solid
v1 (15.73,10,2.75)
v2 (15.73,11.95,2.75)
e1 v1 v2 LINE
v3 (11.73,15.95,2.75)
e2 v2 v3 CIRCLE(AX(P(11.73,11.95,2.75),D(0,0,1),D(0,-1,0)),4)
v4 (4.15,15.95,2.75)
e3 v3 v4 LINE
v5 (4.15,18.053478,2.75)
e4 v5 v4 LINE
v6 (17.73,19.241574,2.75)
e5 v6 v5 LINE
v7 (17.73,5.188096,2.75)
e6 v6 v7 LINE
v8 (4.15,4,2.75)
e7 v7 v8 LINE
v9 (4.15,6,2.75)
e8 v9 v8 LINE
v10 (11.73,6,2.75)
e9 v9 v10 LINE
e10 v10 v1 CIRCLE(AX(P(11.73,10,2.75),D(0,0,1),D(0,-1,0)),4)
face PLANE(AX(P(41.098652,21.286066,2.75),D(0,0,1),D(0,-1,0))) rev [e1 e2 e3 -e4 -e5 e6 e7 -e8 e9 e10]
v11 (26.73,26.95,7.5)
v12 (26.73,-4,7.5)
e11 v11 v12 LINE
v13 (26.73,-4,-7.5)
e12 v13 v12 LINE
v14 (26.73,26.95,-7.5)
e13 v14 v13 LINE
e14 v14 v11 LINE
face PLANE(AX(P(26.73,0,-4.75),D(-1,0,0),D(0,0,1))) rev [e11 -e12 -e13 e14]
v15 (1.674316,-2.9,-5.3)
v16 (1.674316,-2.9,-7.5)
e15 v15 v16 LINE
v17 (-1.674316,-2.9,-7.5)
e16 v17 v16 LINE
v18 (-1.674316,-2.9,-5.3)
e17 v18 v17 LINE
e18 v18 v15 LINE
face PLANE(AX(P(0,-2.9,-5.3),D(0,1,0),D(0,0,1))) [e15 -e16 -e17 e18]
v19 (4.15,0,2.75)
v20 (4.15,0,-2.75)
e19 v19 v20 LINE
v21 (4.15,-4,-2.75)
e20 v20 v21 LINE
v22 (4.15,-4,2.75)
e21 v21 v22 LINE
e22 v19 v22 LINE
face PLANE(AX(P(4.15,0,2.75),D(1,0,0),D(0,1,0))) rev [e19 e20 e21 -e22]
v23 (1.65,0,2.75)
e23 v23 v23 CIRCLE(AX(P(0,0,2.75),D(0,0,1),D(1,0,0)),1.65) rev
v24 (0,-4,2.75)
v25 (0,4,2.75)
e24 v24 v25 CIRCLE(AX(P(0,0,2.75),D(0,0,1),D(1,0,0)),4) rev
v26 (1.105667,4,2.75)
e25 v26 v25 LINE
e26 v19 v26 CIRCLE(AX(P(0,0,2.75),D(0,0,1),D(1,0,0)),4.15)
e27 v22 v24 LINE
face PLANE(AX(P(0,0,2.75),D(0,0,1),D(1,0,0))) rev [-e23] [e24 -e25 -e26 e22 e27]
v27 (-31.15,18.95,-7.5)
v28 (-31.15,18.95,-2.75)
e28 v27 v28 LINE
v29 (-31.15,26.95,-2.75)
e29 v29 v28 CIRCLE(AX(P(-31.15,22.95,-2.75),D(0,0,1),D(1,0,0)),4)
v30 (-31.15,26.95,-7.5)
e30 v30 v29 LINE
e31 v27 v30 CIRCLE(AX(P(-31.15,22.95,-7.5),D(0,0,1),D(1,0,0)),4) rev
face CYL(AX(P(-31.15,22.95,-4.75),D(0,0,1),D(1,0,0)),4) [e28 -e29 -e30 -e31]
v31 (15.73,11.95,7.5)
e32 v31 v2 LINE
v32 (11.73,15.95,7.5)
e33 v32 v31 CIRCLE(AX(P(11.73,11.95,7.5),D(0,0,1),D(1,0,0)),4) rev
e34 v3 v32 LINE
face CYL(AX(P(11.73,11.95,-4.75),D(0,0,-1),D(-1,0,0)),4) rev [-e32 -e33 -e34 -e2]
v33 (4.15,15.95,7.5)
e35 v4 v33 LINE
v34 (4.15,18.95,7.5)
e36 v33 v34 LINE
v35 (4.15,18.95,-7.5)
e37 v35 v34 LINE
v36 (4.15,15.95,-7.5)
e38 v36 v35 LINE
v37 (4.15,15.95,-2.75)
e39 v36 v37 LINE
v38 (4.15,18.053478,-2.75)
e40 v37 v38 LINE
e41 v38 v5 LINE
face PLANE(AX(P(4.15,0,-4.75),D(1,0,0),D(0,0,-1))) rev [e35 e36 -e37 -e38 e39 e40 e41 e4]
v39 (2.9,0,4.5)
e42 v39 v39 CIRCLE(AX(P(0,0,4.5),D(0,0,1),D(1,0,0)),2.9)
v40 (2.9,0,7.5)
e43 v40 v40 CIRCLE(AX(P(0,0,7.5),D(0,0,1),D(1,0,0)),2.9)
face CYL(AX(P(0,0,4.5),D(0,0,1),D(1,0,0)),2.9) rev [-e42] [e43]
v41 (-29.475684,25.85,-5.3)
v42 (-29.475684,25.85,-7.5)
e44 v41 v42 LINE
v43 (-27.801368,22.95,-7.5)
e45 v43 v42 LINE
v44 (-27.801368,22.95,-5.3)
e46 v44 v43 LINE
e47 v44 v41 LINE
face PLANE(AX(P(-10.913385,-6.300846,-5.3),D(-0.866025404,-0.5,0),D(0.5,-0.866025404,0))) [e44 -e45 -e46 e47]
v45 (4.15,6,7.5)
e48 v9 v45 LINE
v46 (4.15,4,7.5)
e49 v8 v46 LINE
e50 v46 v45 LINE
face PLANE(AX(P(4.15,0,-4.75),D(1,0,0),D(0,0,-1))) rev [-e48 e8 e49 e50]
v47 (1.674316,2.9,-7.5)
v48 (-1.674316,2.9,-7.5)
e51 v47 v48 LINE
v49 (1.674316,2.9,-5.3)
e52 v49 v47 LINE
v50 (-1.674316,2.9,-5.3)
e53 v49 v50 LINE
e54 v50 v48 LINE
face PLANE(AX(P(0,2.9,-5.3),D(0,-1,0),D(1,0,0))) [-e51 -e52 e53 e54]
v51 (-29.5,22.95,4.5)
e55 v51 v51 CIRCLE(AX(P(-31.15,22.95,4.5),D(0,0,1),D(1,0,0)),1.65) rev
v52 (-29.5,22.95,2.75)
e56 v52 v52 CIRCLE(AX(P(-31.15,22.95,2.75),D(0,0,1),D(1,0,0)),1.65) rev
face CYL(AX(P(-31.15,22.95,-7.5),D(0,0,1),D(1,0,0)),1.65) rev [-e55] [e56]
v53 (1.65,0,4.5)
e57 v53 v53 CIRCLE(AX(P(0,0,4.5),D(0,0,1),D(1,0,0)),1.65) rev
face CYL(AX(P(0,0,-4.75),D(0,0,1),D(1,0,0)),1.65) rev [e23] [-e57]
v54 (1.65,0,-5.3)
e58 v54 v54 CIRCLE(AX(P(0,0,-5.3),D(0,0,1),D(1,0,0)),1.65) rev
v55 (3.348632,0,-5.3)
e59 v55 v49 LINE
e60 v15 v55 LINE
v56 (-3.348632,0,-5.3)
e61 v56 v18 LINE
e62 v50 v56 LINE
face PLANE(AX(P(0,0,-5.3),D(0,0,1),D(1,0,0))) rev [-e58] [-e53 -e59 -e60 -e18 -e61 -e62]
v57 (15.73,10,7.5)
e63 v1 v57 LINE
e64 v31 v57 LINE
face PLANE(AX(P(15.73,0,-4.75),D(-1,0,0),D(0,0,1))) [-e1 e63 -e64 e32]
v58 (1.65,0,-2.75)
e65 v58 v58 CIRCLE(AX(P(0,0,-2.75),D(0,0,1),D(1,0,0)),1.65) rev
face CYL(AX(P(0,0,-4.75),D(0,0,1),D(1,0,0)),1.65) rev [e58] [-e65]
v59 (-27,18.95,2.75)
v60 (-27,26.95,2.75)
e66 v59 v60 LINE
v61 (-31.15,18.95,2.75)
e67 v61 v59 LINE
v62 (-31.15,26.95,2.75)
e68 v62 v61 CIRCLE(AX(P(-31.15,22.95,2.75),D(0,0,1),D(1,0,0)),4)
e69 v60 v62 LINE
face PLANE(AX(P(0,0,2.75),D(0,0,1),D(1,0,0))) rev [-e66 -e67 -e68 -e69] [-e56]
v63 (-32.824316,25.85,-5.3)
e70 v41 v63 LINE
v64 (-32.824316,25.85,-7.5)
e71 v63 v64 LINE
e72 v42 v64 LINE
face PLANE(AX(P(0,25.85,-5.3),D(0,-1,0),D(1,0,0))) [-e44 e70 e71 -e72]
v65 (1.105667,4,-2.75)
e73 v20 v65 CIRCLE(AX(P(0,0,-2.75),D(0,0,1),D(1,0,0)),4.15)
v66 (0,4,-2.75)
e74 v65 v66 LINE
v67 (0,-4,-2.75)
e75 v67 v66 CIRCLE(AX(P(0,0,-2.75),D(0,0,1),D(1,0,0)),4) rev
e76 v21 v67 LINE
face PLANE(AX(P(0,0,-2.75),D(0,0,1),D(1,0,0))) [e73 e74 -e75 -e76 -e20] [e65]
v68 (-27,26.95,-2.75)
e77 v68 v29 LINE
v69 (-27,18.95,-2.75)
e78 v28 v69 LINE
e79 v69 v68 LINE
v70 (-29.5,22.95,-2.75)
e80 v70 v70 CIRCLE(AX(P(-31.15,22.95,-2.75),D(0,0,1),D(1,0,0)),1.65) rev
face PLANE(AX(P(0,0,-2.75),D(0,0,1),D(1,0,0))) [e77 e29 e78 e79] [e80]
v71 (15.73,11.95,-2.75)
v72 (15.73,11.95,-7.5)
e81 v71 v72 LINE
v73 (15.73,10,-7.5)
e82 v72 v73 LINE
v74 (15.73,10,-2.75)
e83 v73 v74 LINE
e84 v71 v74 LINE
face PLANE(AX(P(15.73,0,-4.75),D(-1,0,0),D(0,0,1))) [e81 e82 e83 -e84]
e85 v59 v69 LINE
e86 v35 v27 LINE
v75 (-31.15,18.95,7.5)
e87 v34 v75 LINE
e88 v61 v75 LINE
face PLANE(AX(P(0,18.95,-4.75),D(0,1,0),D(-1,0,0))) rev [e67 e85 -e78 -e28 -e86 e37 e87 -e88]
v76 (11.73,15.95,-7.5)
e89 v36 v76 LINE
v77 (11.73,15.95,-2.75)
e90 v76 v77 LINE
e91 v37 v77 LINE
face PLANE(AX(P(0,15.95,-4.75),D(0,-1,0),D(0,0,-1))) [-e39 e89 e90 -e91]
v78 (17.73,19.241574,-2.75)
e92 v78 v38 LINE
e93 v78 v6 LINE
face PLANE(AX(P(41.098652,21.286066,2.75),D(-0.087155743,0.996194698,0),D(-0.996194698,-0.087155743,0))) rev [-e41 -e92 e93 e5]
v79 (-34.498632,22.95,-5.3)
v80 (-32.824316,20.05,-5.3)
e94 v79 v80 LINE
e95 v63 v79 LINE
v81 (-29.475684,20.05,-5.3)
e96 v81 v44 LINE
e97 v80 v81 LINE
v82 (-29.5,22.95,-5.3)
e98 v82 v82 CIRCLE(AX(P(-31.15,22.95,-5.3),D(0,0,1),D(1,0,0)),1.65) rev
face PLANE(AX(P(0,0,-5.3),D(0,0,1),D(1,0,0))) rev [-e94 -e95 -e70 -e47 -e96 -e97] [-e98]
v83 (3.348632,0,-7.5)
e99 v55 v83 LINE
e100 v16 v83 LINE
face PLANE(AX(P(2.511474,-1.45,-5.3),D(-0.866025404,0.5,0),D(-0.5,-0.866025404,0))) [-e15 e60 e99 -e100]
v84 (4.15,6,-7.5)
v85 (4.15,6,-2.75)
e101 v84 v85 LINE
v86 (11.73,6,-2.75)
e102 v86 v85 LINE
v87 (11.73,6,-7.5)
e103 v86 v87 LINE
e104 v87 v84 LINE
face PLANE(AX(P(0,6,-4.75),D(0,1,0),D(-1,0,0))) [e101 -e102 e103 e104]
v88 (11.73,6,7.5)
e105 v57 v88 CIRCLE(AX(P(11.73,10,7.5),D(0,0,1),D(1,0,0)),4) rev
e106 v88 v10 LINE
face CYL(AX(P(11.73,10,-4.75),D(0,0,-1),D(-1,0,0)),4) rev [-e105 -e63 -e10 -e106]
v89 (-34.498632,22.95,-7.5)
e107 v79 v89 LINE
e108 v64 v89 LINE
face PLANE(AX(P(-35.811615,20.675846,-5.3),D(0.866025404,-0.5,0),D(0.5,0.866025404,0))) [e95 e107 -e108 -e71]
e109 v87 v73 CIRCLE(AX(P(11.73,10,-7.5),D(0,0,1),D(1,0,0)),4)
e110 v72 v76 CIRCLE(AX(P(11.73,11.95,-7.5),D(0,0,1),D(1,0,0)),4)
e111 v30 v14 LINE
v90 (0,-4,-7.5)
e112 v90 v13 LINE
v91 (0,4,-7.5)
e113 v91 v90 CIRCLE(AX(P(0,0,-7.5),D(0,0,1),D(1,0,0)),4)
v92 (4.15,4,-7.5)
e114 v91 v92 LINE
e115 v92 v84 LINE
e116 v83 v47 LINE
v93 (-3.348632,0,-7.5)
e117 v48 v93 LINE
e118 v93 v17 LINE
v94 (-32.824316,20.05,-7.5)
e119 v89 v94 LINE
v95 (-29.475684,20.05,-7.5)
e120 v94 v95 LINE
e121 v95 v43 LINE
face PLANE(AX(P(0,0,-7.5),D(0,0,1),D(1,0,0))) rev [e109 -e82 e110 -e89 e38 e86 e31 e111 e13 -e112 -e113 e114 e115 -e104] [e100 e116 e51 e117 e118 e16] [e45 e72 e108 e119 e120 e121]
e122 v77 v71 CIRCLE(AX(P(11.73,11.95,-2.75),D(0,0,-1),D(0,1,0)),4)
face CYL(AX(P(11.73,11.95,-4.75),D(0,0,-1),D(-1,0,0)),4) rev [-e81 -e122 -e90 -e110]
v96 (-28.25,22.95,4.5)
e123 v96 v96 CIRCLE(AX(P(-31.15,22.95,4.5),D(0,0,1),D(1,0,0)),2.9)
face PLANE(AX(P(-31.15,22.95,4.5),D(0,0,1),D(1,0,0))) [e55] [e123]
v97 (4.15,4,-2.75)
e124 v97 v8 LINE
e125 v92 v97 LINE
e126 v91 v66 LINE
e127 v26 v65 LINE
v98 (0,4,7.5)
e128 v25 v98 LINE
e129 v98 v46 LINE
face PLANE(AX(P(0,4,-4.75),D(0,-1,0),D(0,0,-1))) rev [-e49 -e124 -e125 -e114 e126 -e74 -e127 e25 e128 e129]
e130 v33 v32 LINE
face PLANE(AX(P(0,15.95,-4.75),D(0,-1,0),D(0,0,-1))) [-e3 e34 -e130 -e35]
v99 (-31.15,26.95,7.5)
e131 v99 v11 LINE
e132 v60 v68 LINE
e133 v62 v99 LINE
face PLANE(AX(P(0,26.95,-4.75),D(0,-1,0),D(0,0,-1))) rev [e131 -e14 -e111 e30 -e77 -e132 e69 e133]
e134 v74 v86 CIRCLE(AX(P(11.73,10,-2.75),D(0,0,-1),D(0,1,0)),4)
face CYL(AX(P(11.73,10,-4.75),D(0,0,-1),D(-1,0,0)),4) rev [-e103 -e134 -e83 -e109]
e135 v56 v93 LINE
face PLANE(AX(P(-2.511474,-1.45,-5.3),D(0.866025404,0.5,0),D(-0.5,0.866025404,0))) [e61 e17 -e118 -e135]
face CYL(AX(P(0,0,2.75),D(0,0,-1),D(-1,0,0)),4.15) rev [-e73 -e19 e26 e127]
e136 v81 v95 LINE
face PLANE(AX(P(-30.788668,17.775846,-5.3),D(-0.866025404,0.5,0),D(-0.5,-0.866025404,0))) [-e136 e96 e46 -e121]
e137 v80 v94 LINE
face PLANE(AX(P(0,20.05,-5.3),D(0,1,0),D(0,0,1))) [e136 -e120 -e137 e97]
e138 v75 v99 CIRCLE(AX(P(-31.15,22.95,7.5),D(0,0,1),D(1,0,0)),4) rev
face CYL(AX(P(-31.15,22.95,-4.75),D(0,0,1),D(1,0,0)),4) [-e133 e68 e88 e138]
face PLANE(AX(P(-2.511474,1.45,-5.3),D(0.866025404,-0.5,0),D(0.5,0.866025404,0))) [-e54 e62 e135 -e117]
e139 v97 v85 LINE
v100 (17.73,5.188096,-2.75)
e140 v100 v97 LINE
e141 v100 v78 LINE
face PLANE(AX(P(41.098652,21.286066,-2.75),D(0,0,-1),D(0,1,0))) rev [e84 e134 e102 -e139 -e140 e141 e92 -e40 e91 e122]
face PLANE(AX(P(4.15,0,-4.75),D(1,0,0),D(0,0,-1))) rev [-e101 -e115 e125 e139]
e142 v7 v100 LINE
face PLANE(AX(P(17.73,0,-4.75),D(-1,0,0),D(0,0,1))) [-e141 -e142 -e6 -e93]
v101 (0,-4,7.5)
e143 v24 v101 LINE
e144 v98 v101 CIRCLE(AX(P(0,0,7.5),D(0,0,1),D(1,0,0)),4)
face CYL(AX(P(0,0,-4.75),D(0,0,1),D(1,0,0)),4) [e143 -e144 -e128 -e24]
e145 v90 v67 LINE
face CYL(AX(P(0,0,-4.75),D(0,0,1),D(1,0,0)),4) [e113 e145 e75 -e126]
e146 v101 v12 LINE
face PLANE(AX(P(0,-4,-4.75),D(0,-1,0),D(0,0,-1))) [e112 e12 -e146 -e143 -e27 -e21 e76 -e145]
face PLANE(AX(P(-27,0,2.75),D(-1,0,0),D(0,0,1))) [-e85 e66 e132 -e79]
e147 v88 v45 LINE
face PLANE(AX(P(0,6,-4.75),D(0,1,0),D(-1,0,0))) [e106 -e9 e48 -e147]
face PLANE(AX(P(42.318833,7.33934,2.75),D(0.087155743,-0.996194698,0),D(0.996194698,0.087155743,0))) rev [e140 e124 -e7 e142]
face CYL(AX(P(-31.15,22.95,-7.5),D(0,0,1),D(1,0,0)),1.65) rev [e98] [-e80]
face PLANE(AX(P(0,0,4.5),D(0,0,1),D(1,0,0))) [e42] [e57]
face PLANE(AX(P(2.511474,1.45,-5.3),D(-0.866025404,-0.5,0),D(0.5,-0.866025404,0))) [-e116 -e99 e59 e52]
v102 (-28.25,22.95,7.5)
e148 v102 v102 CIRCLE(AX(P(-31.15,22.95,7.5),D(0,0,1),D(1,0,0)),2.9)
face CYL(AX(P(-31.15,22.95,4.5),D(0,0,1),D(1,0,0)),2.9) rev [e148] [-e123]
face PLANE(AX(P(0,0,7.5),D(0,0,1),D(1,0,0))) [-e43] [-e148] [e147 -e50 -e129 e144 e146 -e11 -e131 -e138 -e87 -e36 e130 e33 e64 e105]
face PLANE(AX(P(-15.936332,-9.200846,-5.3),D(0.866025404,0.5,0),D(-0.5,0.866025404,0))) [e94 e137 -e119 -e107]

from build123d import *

# Parameters (mm, degrees)
BOSS_EXTRUDE1_DEPTH      = 4.75
BOSS_EXTRUDE1_DEPTH_BACK = 4.75
SKETCH1_R                = 1.65
BOSS_EXTRUDE3_START      = -7.5
BOSS_EXTRUDE3_OUTLINE_R  = 1.65
BOSS_EXTRUDE3_DEPTH      = 15
CUT_EXTRUDE1_START       = -2.75
CUT_EXTRUDE1_OUTLINE_R   = 1.65
CUT_EXTRUDE1_DEPTH       = 5.5
CUT_EXTRUDE2_REACH       = 117.308
SKETCH3_W                = 5.5
SKETCH3_H                = 14
FILLET1_R                = 4
CUT_EXTRUDE3_START       = 7.5
SKETCH4_R                = 2.9
CUT_EXTRUDE3_DEPTH       = 3
CUT_EXTRUDE4_START       = -5.3
SKETCH4_4_R              = 2.9
CUT_EXTRUDE4_DEPTH       = 2.2


# Read off the part's stored shape, not the designer's step: Boss-Extrude3, Cut-Extrude1
with BuildPart() as part:
    # Sketch1 → Boss-Extrude1 (new, two sides: drawn at the far end of the back side and taken through both)
    with BuildSketch(Plane.XY.offset(-BOSS_EXTRUDE1_DEPTH_BACK)):
        with BuildLine():
            ThreePointArc((0, 4), (-4, 0), (0, -4))
            Line((0, -4), (26.73, -4))
            Line((26.73, -4), (26.73, 26.95))
            Line((26.73, 26.95), (-31.15, 26.95))
            ThreePointArc((-31.15, 26.95), (-35.15, 22.95), (-31.15, 18.95))
            Line((-31.15, 18.95), (4.15, 18.95))
            Line((4.15, 18.95), (4.15, 15.95))
            Line((4.15, 15.95), (15.73, 15.95))
            Line((15.73, 15.95), (15.73, 6))
            Line((15.73, 6), (4.15, 6))
            Line((4.15, 6), (4.15, 4))
            Line((4.15, 4), (0, 4))
        make_face()
        Circle(SKETCH1_R, mode=Mode.SUBTRACT)
        Polygon((-27.685898385, 22.95), (-29.417949192, 19.95), (-32.882050808, 19.95), (-34.614101615, 22.95), (-32.882050808, 25.95), (-29.417949192, 25.95), align=None, mode=Mode.SUBTRACT)
    extrude(amount=BOSS_EXTRUDE1_DEPTH + BOSS_EXTRUDE1_DEPTH_BACK)

    # Boss-Extrude3 outline → Boss-Extrude3 (add)
    with BuildSketch(Plane.XY.offset(BOSS_EXTRUDE3_START)):
        with BuildLine():
            Line((4.15, 4), (0, 4))
            ThreePointArc((0, 4), (-4, 0), (0, -4))
            Line((0, -4), (26.73, -4))
            Line((26.73, -4), (26.73, 26.95))
            Line((26.73, 26.95), (-31.15, 26.95))
            ThreePointArc((-31.15, 26.95), (-35.15, 22.95), (-31.15, 18.95))
            Line((-31.15, 18.95), (4.15, 18.95))
            Line((4.15, 18.95), (4.15, 15.95))
            Line((4.15, 15.95), (15.73, 15.95))
            Line((15.73, 15.95), (15.73, 6))
            Line((15.73, 6), (4.15, 6))
            Line((4.15, 6), (4.15, 4))
        make_face()
        Circle(BOSS_EXTRUDE3_OUTLINE_R, mode=Mode.SUBTRACT)
        with Locations((-31.15, 22.95)):
            Circle(BOSS_EXTRUDE3_OUTLINE_R, mode=Mode.SUBTRACT)
    extrude(amount=BOSS_EXTRUDE3_DEPTH)

    # Cut-Extrude1 outline → Cut-Extrude1 (cut)
    # profile 1 of 2: a face of its own
    with BuildSketch(Plane.XY.offset(CUT_EXTRUDE1_START)):
        with BuildLine():
            Line((0, -4), (4.15, -4))
            Line((4.15, -4), (4.15, 0))
            ThreePointArc((4.15, 0), (3.302349085, 2.513362393), (1.105667219, 4))
            Line((1.105667219, 4), (0, 4))
            ThreePointArc((0, 4), (-4, 0), (0, -4))
        make_face()
        Circle(CUT_EXTRUDE1_OUTLINE_R, mode=Mode.SUBTRACT)
    # profile 2 of 2: a face of its own
    with BuildSketch(Plane.XY.offset(CUT_EXTRUDE1_START)):
        with BuildLine():
            Line((-27, 18.95), (-27, 26.95))
            Line((-27, 26.95), (-31.15, 26.95))
            ThreePointArc((-31.15, 26.95), (-35.15, 22.95), (-31.15, 18.95))
            Line((-31.15, 18.95), (-27, 18.95))
        make_face()
        with Locations((-31.15, 22.95)):
            Circle(CUT_EXTRUDE1_OUTLINE_R, mode=Mode.SUBTRACT)
    extrude(amount=CUT_EXTRUDE1_DEPTH, mode=Mode.SUBTRACT)

    # Cut-Extrude2: up to this plane
    cut_extrude2_end = Plane(origin=(17.73, 0, -4.75), z_dir=(-1, 0, 0))
    # Sketch3 → Cut-Extrude2 (cut, up to the surface)
    with BuildSketch(Plane(origin=(-4.830790631, 106.650906635, 0), x_dir=(0, 0, -1), z_dir=(-0.9961946980917455, -0.08715574274765839, 0)), mode=Mode.PRIVATE) as cut_extrude2_sk1:
        with Locations((0, 96.043016422)):
            Rectangle(SKETCH3_W, SKETCH3_H)
    cut_extrude2_tool1 = split(extrude(cut_extrude2_sk1.sketch, amount=-CUT_EXTRUDE2_REACH, mode=Mode.PRIVATE), bisect_by=cut_extrude2_end, keep=Keep.BOTH, mode=Mode.PRIVATE)
    add(cut_extrude2_tool1.solids().sort_by_distance((3.53991, 10.973363, 0))[0], mode=Mode.SUBTRACT)

    # Fillet1
    fillet1_edges = [part.edges().sort_by_distance(p)[0] for p in [
        (15.73, 6, 5.125),
        (15.73, 15.95, 5.125),
        (15.73, 6, -5.125),
        (15.73, 15.95, -5.125),
    ]]
    fillet(fillet1_edges, radius=FILLET1_R)

    # Sketch4 → Cut-Extrude3 (cut)
    with BuildSketch(Plane.XY.offset(CUT_EXTRUDE3_START)):
        with Locations((-31.15, 22.95)):
            Circle(SKETCH4_R)
        Circle(SKETCH4_R)
    extrude(amount=-CUT_EXTRUDE3_DEPTH, mode=Mode.SUBTRACT)

    # Sketch4<4> → Cut-Extrude4 (cut)
    with BuildSketch(Plane.XY.offset(CUT_EXTRUDE4_START)):
        Circle(SKETCH4_4_R)
        with BuildLine():
            Line((-1.674315781, -2.9), (0, -2.9))
            ThreePointArc((0, -2.9), (-1.450000053, -2.511473641), (-2.511473732, -1.449999895))
            Line((-2.511473732, -1.449999895), (-1.674315781, -2.9))
        make_face()
        with BuildLine():
            ThreePointArc((-2.511473732, -1.449999895), (-2.9, 9e-09), (-2.511473723, 1.44999991))
            Line((-2.511473723, 1.44999991), (-3.348631561, 0))
            Line((-3.348631561, 0), (-2.511473732, -1.449999895))
        make_face()
        with BuildLine():
            ThreePointArc((-2.511473723, 1.44999991), (-1.45000005, 2.511473642), (-1.2e-08, 2.9))
            Line((-1.2e-08, 2.9), (-1.674315781, 2.9))
            Line((-1.674315781, 2.9), (-2.511473723, 1.44999991))
        make_face()
        with BuildLine():
            ThreePointArc((-1.2e-08, 2.9), (1.449999995, 2.511473674), (2.511473671, 1.45))
            Line((2.511473671, 1.45), (1.674315781, 2.9))
            Line((1.674315781, 2.9), (-1.2e-08, 2.9))
        make_face()
        with BuildLine():
            Line((2.511473679, -1.449999986), (3.348631561, 0))
            Line((3.348631561, 0), (2.511473671, 1.45))
            ThreePointArc((2.511473671, 1.45), (2.801184896, 0.750575231), (2.9, 0))
            ThreePointArc((2.9, 0), (2.801184898, -0.750575223), (2.511473679, -1.449999986))
        make_face()
        with BuildLine():
            Line((1.674315781, -2.9), (2.511473679, -1.449999986))
            ThreePointArc((2.511473679, -1.449999986), (1.450000007, -2.511473667), (0, -2.9))
            Line((0, -2.9), (1.674315781, -2.9))
        make_face()
        with Locations((-31.15, 22.95)):
            Circle(SKETCH4_4_R)
        with BuildLine():
            Line((-29.475684219, 20.05), (-28.638526291, 21.500000065))
            ThreePointArc((-28.638526291, 21.500000065), (-29.699999968, 20.438526348), (-31.15, 20.05))
            Line((-31.15, 20.05), (-29.475684219, 20.05))
        make_face()
        with BuildLine():
            Line((-28.638526291, 21.500000065), (-27.801368439, 22.95))
            Line((-27.801368439, 22.95), (-28.638526352, 24.40000004))
            ThreePointArc((-28.638526352, 24.40000004), (-28.34881511, 23.700575253), (-28.25, 22.95))
            ThreePointArc((-28.25, 22.95), (-28.348815094, 22.199424805), (-28.638526291, 21.500000065))
        make_face()
        with BuildLine():
            ThreePointArc((-31.150000038, 25.85), (-29.700000036, 25.461473692), (-28.638526352, 24.40000004))
            Line((-28.638526352, 24.40000004), (-29.475684219, 25.85))
            Line((-29.475684219, 25.85), (-31.150000038, 25.85))
        make_face()
        with BuildLine():
            ThreePointArc((-33.661473709, 24.399999935), (-32.600000049, 25.461473643), (-31.150000038, 25.85))
            Line((-31.150000038, 25.85), (-32.824315781, 25.85))
            Line((-32.824315781, 25.85), (-33.661473709, 24.399999935))
        make_face()
        with BuildLine():
            ThreePointArc((-33.661473549, 21.499999789), (-34.05, 22.949999841), (-33.661473709, 24.399999935))
            Line((-33.661473709, 24.399999935), (-34.498631561, 22.95))
            Line((-34.498631561, 22.95), (-33.661473549, 21.499999789))
        make_face()
        with BuildLine():
            Line((-32.824315781, 20.05), (-31.15, 20.05))
            ThreePointArc((-31.15, 20.05), (-32.599999895, 20.438526268), (-33.661473549, 21.499999789))
            Line((-33.661473549, 21.499999789), (-32.824315781, 20.05))
        make_face()
    extrude(amount=-CUT_EXTRUDE4_DEPTH, mode=Mode.SUBTRACT)


solid = part.part
